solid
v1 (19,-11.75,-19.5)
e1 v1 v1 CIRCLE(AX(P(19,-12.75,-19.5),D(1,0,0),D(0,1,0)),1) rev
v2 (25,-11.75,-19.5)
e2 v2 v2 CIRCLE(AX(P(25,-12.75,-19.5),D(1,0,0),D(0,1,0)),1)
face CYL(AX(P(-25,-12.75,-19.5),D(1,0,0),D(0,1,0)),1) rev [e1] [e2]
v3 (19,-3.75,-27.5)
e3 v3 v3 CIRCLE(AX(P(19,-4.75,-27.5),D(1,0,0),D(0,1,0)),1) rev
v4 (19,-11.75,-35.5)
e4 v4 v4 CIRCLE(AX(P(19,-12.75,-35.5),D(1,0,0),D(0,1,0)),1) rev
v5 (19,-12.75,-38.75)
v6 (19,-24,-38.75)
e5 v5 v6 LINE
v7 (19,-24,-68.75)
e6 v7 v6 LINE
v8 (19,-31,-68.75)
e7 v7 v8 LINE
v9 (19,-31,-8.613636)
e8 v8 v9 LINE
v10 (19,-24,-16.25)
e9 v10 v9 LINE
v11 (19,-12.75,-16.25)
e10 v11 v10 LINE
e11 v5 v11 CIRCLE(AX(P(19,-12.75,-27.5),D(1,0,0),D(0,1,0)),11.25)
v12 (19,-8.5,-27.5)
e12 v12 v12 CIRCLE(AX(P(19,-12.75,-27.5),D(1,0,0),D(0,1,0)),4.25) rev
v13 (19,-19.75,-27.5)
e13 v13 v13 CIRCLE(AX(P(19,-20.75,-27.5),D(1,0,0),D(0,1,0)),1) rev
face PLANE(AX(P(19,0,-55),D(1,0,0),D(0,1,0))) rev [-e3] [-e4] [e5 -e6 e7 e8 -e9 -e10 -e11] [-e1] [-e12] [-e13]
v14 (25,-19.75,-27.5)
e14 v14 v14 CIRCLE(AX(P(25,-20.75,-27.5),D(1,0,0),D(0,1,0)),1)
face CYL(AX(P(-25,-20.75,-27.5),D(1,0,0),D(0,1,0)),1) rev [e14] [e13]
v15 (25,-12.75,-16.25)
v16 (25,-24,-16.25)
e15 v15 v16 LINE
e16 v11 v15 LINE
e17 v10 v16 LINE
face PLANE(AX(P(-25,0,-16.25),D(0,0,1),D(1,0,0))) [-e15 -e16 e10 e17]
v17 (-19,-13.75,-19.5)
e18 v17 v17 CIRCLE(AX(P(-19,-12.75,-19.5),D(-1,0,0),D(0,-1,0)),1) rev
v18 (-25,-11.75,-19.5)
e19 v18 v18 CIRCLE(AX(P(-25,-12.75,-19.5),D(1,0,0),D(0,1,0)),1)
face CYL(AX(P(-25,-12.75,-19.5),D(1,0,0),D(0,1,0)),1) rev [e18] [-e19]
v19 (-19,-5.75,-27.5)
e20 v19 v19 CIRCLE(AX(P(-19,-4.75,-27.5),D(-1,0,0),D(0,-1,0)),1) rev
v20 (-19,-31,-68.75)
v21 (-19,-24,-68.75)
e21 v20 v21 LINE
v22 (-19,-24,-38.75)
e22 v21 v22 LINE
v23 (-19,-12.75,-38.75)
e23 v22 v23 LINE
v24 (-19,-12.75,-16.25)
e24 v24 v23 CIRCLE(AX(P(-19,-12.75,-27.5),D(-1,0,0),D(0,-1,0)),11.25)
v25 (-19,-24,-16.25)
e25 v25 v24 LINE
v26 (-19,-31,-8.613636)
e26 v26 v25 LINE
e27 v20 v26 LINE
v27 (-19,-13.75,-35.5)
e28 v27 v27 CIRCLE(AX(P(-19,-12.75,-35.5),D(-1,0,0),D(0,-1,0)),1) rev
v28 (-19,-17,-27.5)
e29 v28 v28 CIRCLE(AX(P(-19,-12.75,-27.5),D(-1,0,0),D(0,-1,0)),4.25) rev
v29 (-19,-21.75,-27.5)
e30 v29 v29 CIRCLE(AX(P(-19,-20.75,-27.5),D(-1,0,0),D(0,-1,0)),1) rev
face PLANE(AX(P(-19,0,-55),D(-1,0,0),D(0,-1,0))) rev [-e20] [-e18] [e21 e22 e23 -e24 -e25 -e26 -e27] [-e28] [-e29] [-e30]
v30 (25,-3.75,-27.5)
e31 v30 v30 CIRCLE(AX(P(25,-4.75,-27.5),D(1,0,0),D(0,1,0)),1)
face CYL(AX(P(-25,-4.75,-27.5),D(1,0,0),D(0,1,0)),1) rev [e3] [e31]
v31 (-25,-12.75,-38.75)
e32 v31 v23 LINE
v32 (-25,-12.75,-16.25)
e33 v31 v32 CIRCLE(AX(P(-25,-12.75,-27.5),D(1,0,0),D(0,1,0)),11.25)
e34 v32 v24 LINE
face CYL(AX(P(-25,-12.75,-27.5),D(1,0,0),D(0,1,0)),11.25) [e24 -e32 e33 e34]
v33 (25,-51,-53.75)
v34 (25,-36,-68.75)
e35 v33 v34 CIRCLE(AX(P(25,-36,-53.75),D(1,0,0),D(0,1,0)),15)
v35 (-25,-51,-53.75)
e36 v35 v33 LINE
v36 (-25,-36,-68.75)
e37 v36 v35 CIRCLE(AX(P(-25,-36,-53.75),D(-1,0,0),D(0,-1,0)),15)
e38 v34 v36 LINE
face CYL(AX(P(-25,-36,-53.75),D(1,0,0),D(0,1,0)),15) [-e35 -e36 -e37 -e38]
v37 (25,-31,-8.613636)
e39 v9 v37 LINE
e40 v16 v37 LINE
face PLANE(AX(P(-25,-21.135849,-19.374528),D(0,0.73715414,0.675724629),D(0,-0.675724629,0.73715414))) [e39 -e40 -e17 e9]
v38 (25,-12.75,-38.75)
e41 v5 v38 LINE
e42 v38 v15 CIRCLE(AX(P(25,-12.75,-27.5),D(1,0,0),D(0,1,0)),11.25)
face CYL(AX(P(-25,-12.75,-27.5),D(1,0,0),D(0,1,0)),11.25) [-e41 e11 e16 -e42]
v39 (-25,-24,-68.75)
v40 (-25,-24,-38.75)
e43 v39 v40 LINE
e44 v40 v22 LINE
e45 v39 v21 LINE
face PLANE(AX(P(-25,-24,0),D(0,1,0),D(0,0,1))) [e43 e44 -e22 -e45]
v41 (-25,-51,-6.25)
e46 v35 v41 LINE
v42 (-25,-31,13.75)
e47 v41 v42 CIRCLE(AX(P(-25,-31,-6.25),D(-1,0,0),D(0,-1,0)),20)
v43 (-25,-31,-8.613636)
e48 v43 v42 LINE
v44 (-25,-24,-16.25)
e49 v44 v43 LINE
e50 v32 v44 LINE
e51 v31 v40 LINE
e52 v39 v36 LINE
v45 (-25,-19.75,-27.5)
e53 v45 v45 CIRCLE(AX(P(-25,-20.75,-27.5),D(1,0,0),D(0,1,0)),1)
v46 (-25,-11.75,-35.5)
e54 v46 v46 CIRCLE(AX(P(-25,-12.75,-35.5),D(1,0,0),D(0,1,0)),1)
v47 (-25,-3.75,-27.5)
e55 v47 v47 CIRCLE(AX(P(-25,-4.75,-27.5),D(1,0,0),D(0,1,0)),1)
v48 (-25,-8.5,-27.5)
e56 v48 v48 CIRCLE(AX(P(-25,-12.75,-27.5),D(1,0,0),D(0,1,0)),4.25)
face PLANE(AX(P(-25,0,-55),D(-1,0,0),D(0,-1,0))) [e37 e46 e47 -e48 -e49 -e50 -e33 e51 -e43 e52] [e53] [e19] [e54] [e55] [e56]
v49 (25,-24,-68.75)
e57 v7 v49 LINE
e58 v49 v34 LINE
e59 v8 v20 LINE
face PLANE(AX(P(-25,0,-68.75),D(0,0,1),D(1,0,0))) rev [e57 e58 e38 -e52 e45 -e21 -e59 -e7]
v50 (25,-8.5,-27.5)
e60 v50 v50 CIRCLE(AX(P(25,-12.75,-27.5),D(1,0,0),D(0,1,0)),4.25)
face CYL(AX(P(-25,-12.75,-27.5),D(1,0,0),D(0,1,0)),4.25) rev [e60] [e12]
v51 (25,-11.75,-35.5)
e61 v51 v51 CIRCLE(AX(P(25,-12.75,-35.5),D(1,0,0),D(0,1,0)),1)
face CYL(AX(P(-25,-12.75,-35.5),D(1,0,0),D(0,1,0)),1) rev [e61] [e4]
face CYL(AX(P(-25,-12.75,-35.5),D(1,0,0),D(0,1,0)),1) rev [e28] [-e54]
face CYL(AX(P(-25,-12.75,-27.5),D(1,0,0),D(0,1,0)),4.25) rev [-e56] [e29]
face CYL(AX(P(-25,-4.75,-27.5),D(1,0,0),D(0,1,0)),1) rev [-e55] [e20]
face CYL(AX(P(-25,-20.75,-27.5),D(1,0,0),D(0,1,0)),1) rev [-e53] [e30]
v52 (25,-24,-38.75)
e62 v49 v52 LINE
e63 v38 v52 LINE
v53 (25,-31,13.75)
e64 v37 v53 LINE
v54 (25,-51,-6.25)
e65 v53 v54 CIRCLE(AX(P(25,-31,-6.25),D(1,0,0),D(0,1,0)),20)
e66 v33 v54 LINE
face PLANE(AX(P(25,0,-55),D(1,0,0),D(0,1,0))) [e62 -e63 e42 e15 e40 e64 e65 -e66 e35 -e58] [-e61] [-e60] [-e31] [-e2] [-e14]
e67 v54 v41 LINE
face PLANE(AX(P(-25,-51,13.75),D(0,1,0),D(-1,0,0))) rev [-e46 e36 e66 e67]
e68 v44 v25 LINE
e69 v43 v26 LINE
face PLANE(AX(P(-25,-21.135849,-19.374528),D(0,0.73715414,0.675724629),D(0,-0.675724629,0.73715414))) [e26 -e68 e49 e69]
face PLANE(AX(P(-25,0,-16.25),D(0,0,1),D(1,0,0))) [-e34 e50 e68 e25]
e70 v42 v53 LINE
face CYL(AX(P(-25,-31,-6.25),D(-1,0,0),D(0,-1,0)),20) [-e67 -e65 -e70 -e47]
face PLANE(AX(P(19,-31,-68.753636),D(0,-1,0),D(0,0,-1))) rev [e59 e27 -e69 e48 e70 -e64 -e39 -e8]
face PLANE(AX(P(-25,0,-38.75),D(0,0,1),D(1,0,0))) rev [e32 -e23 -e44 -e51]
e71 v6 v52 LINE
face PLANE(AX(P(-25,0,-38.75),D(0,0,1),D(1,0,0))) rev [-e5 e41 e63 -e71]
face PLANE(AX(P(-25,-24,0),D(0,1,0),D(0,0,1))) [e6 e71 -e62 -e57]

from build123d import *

# Parameters (mm, degrees)
SKETCH1_W            = 50
SKETCH1_H            = 170
BOSS_EXTRUDE1_DEPTH  = 55
SKETCH2_W            = 34
SKETCH2_H            = 27
CUT_EXTRUDE1_DEPTH   = 181.416185527
SKETCH3_W            = 10
SKETCH3_H            = 24
SKETCH3_R            = 4.25
SKETCH3_R_2          = 1
CUT_EXTRUDE2_DEPTH   = 186.539753153
SKETCH4_W            = 2
SKETCH4_H            = 24
CUT_EXTRUDE3_DEPTH   = 178.623196683
SKETCH5_W            = 6.25
SKETCH5_H            = 11.25
CUT_EXTRUDE4_DEPTH   = 186.539753153
SKETCH6_W            = 38
SKETCH6_H            = 10
CUT_EXTRUDE5_DEPTH   = 181.416185527
SKETCH8_W            = 13.25
SKETCH8_H            = 2.25
CUT_EXTRUDE7_DEPTH   = 186.539753153
SKETCH9_W            = 34
SKETCH9_H            = 35.25
CUT_EXTRUDE8_DEPTH   = 179.297679458
SKETCH11_W           = 13.25
SKETCH11_H           = 20.25
CUT_EXTRUDE9_DEPTH   = 184.480414486
SKETCH12_W           = 28.5
SKETCH12_H           = 15
BOSS_EXTRUDE2_DEPTH  = 8
SKETCH14_W           = 34
SKETCH14_H           = 15
SKETCH14_H_2         = 10.25
BOSS_EXTRUDE3_DEPTH  = 13.25
SKETCH16_R           = 4.5
SKETCH16_R_2         = 2.5
CUT_EXTRUDE13_DEPTH  = 8
SKETCH17_R           = 4.5
SKETCH17_W           = 55
SKETCH17_H           = 10.25
CUT_EXTRUDE15_DEPTH  = 175.384811552
SKETCH18_W           = 71.25
SKETCH18_H           = 27.5
SKETCH18_W_2         = 13.75
SKETCH18_W_3         = 16.25
BOSS_EXTRUDE4_DEPTH  = 50
SKETCH19_W           = 38
SKETCH19_H           = 7
CUT_EXTRUDE16_DEPTH  = 152.25227271
SKETCH20_W           = 57.5
SKETCH20_H           = 27.5
CUT_EXTRUDE17_DEPTH  = 102.137591923
CUT_EXTRUDE18_DEPTH  = 100.39221549
SKETCH22_W           = 82.5
SKETCH22_H           = 2.5
BOSS_EXTRUDE5_DEPTH  = 50
SKETCH24_W           = 22
SKETCH24_H           = 17
CUT_EXTRUDE19_DEPTH  = 101.710289941
SKETCH25_W           = 38
SKETCH25_H           = 38.136363636
CUT_EXTRUDE20_DEPTH  = 10
SKETCH26_W           = 82.5
SKETCH26_H           = 2.5
CUT_EXTRUDE21_DEPTH  = 101.710289941
SKETCH27_W           = 38
SKETCH27_H           = 5
BOSS_EXTRUDE6_DEPTH  = 60.14
SKETCH29_W           = 38
SKETCH29_H           = 5
BOSS_EXTRUDE8_DEPTH  = 60.14
SKETCH30_W           = 6
SKETCH30_H           = 17
BOSS_EXTRUDE9_DEPTH  = 22.14
SKETCH31_W           = 22.363636364
SKETCH31_H           = 20.5
BOSS_EXTRUDE10_DEPTH = 50
SKETCH32_W           = 82.5
SKETCH32_H           = 0.5
SKETCH32_W_2         = 0.14
SKETCH32_H_2         = 17
CUT_EXTRUDE22_DEPTH  = 100.489105434
FILLET1_R            = 15
FILLET2_R            = 20


with BuildPart() as part:
    # Sketch1 → Boss-Extrude1 (new body)
    with BuildSketch(Plane.XY):
        with Locations((0, -85)):
            Rectangle(SKETCH1_W, SKETCH1_H)
    extrude(amount=-BOSS_EXTRUDE1_DEPTH)

    # Sketch2 → Cut-Extrude1 (cut, through all)
    with BuildSketch(Plane.XY):
        with Locations((0, -13.5)):
            Rectangle(SKETCH2_W, SKETCH2_H)
    extrude(amount=-CUT_EXTRUDE1_DEPTH, mode=Mode.SUBTRACT)

    # Sketch3 → Cut-Extrude2 (cut, through all)
    with BuildSketch(Plane(origin=(25, 0, 0), x_dir=(0, 0, -1), z_dir=(1, 0, 0))):
        with Locations((50, -12)):
            Rectangle(SKETCH3_W, SKETCH3_H)
        with Locations((5, -12)):
            Rectangle(SKETCH3_W, SKETCH3_H)
        with Locations(Location((27.5, -12.75, 0), (0, 0, 90))):
            Circle(SKETCH3_R)
        with Locations(Location((35.5, -12.75, 0), (0, 0, 90))):
            Circle(SKETCH3_R_2)
        with Locations(Location((27.5, -4.75, 0), (0, 0, 90))):
            Circle(SKETCH3_R_2)
        with Locations(Location((27.5, -20.75, 0), (0, 0, 90))):
            Circle(SKETCH3_R_2)
        with Locations(Location((19.5, -12.75, 0), (0, 0, 90))):
            Circle(SKETCH3_R_2)
    extrude(amount=-CUT_EXTRUDE2_DEPTH, mode=Mode.SUBTRACT)

    # Sketch4 → Cut-Extrude3 (cut, through all)
    with BuildSketch(Plane.XY.offset(-10)):
        with Locations((-18, -12)):
            Rectangle(SKETCH4_W, SKETCH4_H)
        with Locations((18, -12)):
            Rectangle(SKETCH4_W, SKETCH4_H)
    extrude(amount=-CUT_EXTRUDE3_DEPTH, mode=Mode.SUBTRACT)

    # Sketch5 → Cut-Extrude4 (cut, through all)
    with BuildSketch(Plane(origin=(25, 0, 0), x_dir=(0, 0, -1), z_dir=(1, 0, 0))):
        with BuildLine():
            Line((45, 0), (10, 0))
            Line((10, 0), (10, -12.75))
            Line((10, -12.75), (16.25, -12.75))
            ThreePointArc((16.25, -12.75), (27.5, -1.5), (38.75, -12.75))
            Line((38.75, -12.75), (45, -12.75))
            Line((45, -12.75), (45, 0))
        make_face()
        with Locations((13.125, -18.375)):
            Rectangle(SKETCH5_W, SKETCH5_H)
        with Locations((41.875, -18.375)):
            Rectangle(SKETCH5_W, SKETCH5_H)
    extrude(amount=-CUT_EXTRUDE4_DEPTH, mode=Mode.SUBTRACT)

    # Sketch6 → Cut-Extrude5 (cut, through all)
    with BuildSketch(Plane.XY):
        with Locations((0, -29)):
            Rectangle(SKETCH6_W, SKETCH6_H)
    extrude(amount=-CUT_EXTRUDE5_DEPTH, mode=Mode.SUBTRACT)

    # Sketch8 → Cut-Extrude7 (cut, through all)
    with BuildSketch(Plane(origin=(25, 0, 0), x_dir=(0, 0, -1), z_dir=(1, 0, 0))):
        with BuildLine():
            Line((27.5, -157.5), (27.5, -132.5))
            Line((27.5, -132.5), (13.25, -132.5))
            Line((13.25, -132.5), (13.25, -167.75))
            Line((13.25, -167.75), (17.25, -167.75))
            ThreePointArc((17.25, -167.75), (20.252155493, -160.502155493), (27.5, -157.5))
        make_face()
        with BuildLine():
            Line((41.75, -167.75), (41.75, -132.5))
            Line((41.75, -132.5), (27.5, -132.5))
            Line((27.5, -132.5), (27.5, -157.5))
            ThreePointArc((27.5, -157.5), (34.747844507, -160.502155493), (37.75, -167.75))
            Line((37.75, -167.75), (41.75, -167.75))
        make_face()
        with Locations((48.375, -168.875)):
            Rectangle(SKETCH8_W, SKETCH8_H)
        with Locations((6.625, -168.875)):
            Rectangle(SKETCH8_W, SKETCH8_H)
        with BuildLine():
            Line((17.25, -167.75), (13.25, -167.75))
            Line((13.25, -167.75), (13.25, -170))
            Line((13.25, -170), (17.5, -170))
            ThreePointArc((17.5, -170), (17.31269172, -168.881923142), (17.25, -167.75))
        make_face()
        with BuildLine():
            Line((41.75, -170), (41.75, -167.75))
            Line((41.75, -167.75), (37.75, -167.75))
            ThreePointArc((37.75, -167.75), (37.68730828, -168.881923142), (37.5, -170))
            Line((37.5, -170), (41.75, -170))
        make_face()
        with BuildLine():
            Line((27.5, -167.75), (27.5, -157.5))
            ThreePointArc((27.5, -157.5), (20.252155493, -160.502155493), (17.25, -167.75))
            Line((17.25, -167.75), (27.5, -167.75))
        make_face()
        with BuildLine():
            ThreePointArc((37.75, -167.75), (34.747844507, -160.502155493), (27.5, -157.5))
            Line((27.5, -157.5), (27.5, -167.75))
            Line((27.5, -167.75), (37.75, -167.75))
        make_face()
        with BuildLine():
            Line((27.5, -170), (27.5, -167.75))
            Line((27.5, -167.75), (17.25, -167.75))
            ThreePointArc((17.25, -167.75), (17.31269172, -168.881923142), (17.5, -170))
            Line((17.5, -170), (27.5, -170))
        make_face()
        with BuildLine():
            ThreePointArc((37.5, -170), (37.68730828, -168.881923142), (37.75, -167.75))
            Line((37.75, -167.75), (27.5, -167.75))
            Line((27.5, -167.75), (27.5, -170))
            Line((27.5, -170), (37.5, -170))
        make_face()
    extrude(amount=-CUT_EXTRUDE7_DEPTH, mode=Mode.SUBTRACT)

    # Sketch9 → Cut-Extrude8 (cut, through all)
    with BuildSketch(Plane.XY):
        with Locations((0, -150.125)):
            Rectangle(SKETCH9_W, SKETCH9_H)
    extrude(amount=-CUT_EXTRUDE8_DEPTH, mode=Mode.SUBTRACT)

    # Sketch11 → Cut-Extrude9 (cut, through all)
    with BuildSketch(Plane(origin=(25, 0, 0), x_dir=(0, 0, -1), z_dir=(1, 0, 0))):
        with BuildLine():
            ThreePointArc((17.25, -167.75), (20.252155493, -160.502155493), (27.5, -157.5))
            Line((27.5, -157.5), (27.5, -147.5))
            Line((27.5, -147.5), (13.25, -147.5))
            Line((13.25, -147.5), (13.25, -167.75))
            Line((13.25, -167.75), (17.25, -167.75))
        make_face()
        with BuildLine():
            Line((27.5, -147.5), (27.5, -157.5))
            ThreePointArc((27.5, -157.5), (34.747844507, -160.502155493), (37.75, -167.75))
            Line((37.75, -167.75), (41.75, -167.75))
            Line((41.75, -167.75), (41.75, -147.5))
            Line((41.75, -147.5), (27.5, -147.5))
        make_face()
        with Locations((48.375, -157.625)):
            Rectangle(SKETCH11_W, SKETCH11_H)
        with Locations((6.625, -157.625)):
            Rectangle(SKETCH11_W, SKETCH11_H)
    extrude(amount=-CUT_EXTRUDE9_DEPTH, mode=Mode.SUBTRACT)

    # Sketch12 → Boss-Extrude2 (add)
    with BuildSketch(Plane(origin=(25, 0, 0), x_dir=(0, 0, -1), z_dir=(1, 0, 0))):
        with Locations((27.5, -140)):
            Rectangle(SKETCH12_W, SKETCH12_H)
    boss_extrude2 = extrude(amount=-BOSS_EXTRUDE2_DEPTH)

    # Mirror1: Boss-Extrude2 across plane
    add(boss_extrude2.mirror(Plane(origin=(0, 0, 0), x_dir=(0, 0, 1), z_dir=(1, 0, 0))))

    # Sketch14 → Boss-Extrude3 (add)
    with BuildSketch(Plane.XY):
        with Locations((0, -140)):
            Rectangle(SKETCH14_W, SKETCH14_H)
        with Locations((0, -152.625)):
            Rectangle(SKETCH14_W, SKETCH14_H_2)
    boss_extrude3 = extrude(amount=-BOSS_EXTRUDE3_DEPTH)

    # Mirror2: Boss-Extrude3 across plane
    add(boss_extrude3.mirror(Plane.XY.offset(-27.5)))

    # Sketch16 → Cut-Extrude13 (cut)
    # profile 1 of 3: a face of its own
    with BuildSketch(Plane(origin=(25, 0, 0), x_dir=(0, 0, -1), z_dir=(1, 0, 0))):
        with Locations(Location((16.5, -135.75, 0), (0, 0, 90))):
            Circle(SKETCH16_R)
        with Locations((16.5, -135.75)):
            Circle(SKETCH16_R_2, mode=Mode.SUBTRACT)
    # profile 2 of 3: a face of its own
    with BuildSketch(Plane(origin=(25, 0, 0), x_dir=(0, 0, -1), z_dir=(1, 0, 0))):
        with Locations((16.5, -135.75)):
            Circle(SKETCH16_R_2)
    # profile 3 of 3: a face of its own
    with BuildSketch(Plane(origin=(25, 0, 0), x_dir=(0, 0, -1), z_dir=(1, 0, 0))):
        with Locations(Location((38.5, -135.75, 0), (0, 0, 90))):
            Circle(SKETCH16_R)
    cut_extrude13 = extrude(amount=-CUT_EXTRUDE13_DEPTH, mode=Mode.SUBTRACT)

    # Mirror3: Cut-Extrude13 across plane
    add(cut_extrude13.mirror(Plane(origin=(0, 0, 0), x_dir=(0, 0, 1), z_dir=(1, 0, 0))), mode=Mode.SUBTRACT)

    # Sketch17 → Cut-Extrude15 (cut, through all)
    # profile 1 of 4: a face of its own
    with BuildSketch(Plane(origin=(25, 0, 0), x_dir=(0, 0, -1), z_dir=(1, 0, 0))):
        Polygon((55, -51.5), (27.5, -51.5), (0, -51.5), (0, -147.5), (55, -147.5), align=None)
        with Locations((16.5, -135.75)):
            Circle(SKETCH17_R, mode=Mode.SUBTRACT)
        with Locations((38.5, -135.75)):
            Circle(SKETCH17_R, mode=Mode.SUBTRACT)
    # profile 2 of 4: a face of its own
    with BuildSketch(Plane(origin=(25, 0, 0), x_dir=(0, 0, -1), z_dir=(1, 0, 0))):
        with Locations((27.5, -152.625)):
            Rectangle(SKETCH17_W, SKETCH17_H)
    # profile 3 of 4: a face of its own
    with BuildSketch(Plane(origin=(25, 0, 0), x_dir=(0, 0, -1), z_dir=(1, 0, 0))):
        with Locations((38.5, -135.75)):
            Circle(SKETCH17_R)
    # profile 4 of 4: a face of its own
    with BuildSketch(Plane(origin=(25, 0, 0), x_dir=(0, 0, -1), z_dir=(1, 0, 0))):
        with Locations((16.5, -135.75)):
            Circle(SKETCH17_R)
    extrude(amount=-CUT_EXTRUDE15_DEPTH, mode=Mode.SUBTRACT)

    # Sketch18 → Boss-Extrude4 (add)
    with BuildSketch(Plane(origin=(25, 0, 0), x_dir=(0, 0, -1), z_dir=(1, 0, 0))):
        with Locations((-35.625, -37.75)):
            Rectangle(SKETCH18_W, SKETCH18_H)
        with Locations((61.875, -37.75)):
            Rectangle(SKETCH18_W_2, SKETCH18_H)
        Polygon((38.75, -51.5), (38.75, -24), (16.25, -24), (0, -24), (0, -51.5), align=None)
        with Locations((46.875, -37.75)):
            Rectangle(SKETCH18_W_3, SKETCH18_H)
    extrude(amount=-BOSS_EXTRUDE4_DEPTH)

    # Sketch19 → Cut-Extrude16 (cut, through all)
    with BuildSketch(Plane.XY.offset(71.25)):
        with Locations((0, -27.5)):
            Rectangle(SKETCH19_W, SKETCH19_H)
    extrude(amount=-CUT_EXTRUDE16_DEPTH, mode=Mode.SUBTRACT)

    # Sketch20 → Cut-Extrude17 (cut, through all)
    with BuildSketch(Plane(origin=(25, 0, 0), x_dir=(0, 0, -1), z_dir=(1, 0, 0))):
        with Locations((-42.5, -37.75)):
            Rectangle(SKETCH20_W, SKETCH20_H)
    extrude(amount=-CUT_EXTRUDE17_DEPTH, mode=Mode.SUBTRACT)

    # Sketch21 → Cut-Extrude18 (cut, through all)
    with BuildSketch(Plane(origin=(25, 0, 0), x_dir=(0, 0, -1), z_dir=(1, 0, 0))):
        Polygon((16.25, -24), (-13.75, -51.5), (-13.75, -24), align=None)
    extrude(amount=-CUT_EXTRUDE18_DEPTH, mode=Mode.SUBTRACT)

    # Sketch22 → Boss-Extrude5 (add)
    with BuildSketch(Plane(origin=(25, 0, 0), x_dir=(0, 0, -1), z_dir=(1, 0, 0))):
        with Locations((27.5, -52.75)):
            Rectangle(SKETCH22_W, SKETCH22_H)
    extrude(amount=-BOSS_EXTRUDE5_DEPTH)

    # Sketch24 → Cut-Extrude19 (cut, through all)
    with BuildSketch(Plane(origin=(25, 0, 0), x_dir=(0, 0, -1), z_dir=(1, 0, 0))):
        with Locations((57.75, -32.5)):
            Rectangle(SKETCH24_W, SKETCH24_H)
    extrude(amount=-CUT_EXTRUDE19_DEPTH, mode=Mode.SUBTRACT)

    # Sketch25 → Cut-Extrude20 (cut)
    with BuildSketch(Plane(origin=(0, -31, 0), x_dir=(1, 0, 0), z_dir=(0, 1, 0))):
        with Locations((0, 27.681818182)):
            Rectangle(SKETCH25_W, SKETCH25_H)
    extrude(amount=-CUT_EXTRUDE20_DEPTH, mode=Mode.SUBTRACT)

    # Sketch26 → Cut-Extrude21 (cut, through all)
    with BuildSketch(Plane(origin=(25, 0, 0), x_dir=(0, 0, -1), z_dir=(1, 0, 0))):
        with Locations((27.5, -52.75)):
            Rectangle(SKETCH26_W, SKETCH26_H)
    extrude(amount=-CUT_EXTRUDE21_DEPTH, mode=Mode.SUBTRACT)

    # Sketch27 → Boss-Extrude6 (add)
    with BuildSketch(Plane(origin=(0, 0, -8.613636364), x_dir=(-1, 0, 0), z_dir=(0, 0, -1))):
        with Locations((0, -38.5)):
            Rectangle(SKETCH27_W, SKETCH27_H)
    extrude(amount=BOSS_EXTRUDE6_DEPTH)

    # Sketch29 → Boss-Extrude8 (add)
    with BuildSketch(Plane(origin=(0, 0, -8.613636364), x_dir=(-1, 0, 0), z_dir=(0, 0, -1))):
        with Locations((0, -33.5)):
            Rectangle(SKETCH29_W, SKETCH29_H)
    extrude(amount=BOSS_EXTRUDE8_DEPTH)

    # Sketch30 → Boss-Extrude9 (add)
    with BuildSketch(Plane(origin=(0, 0, -46.75), x_dir=(-1, 0, 0), z_dir=(0, 0, -1))):
        with Locations((-22, -32.5)):
            Rectangle(SKETCH30_W, SKETCH30_H)
        with Locations((22, -32.5)):
            Rectangle(SKETCH30_W, SKETCH30_H)
    extrude(amount=BOSS_EXTRUDE9_DEPTH)

    # Sketch31 → Boss-Extrude10 (add)
    with BuildSketch(Plane(origin=(25, 0, 0), x_dir=(0, 0, -1), z_dir=(1, 0, 0))):
        with Locations((-2.568181818, -41.25)):
            Rectangle(SKETCH31_W, SKETCH31_H)
    extrude(amount=-BOSS_EXTRUDE10_DEPTH)

    # Sketch32 → Cut-Extrude22 (cut, through all)
    with BuildSketch(Plane(origin=(25, 0, 0), x_dir=(0, 0, -1), z_dir=(1, 0, 0))):
        with Locations((27.5, -51.25)):
            Rectangle(SKETCH32_W, SKETCH32_H)
        with Locations((68.82, -32.5)):
            Rectangle(SKETCH32_W_2, SKETCH32_H_2)
    extrude(amount=-CUT_EXTRUDE22_DEPTH, mode=Mode.SUBTRACT)

    # Fillet1
    fillet1_edges = [part.edges().sort_by_distance(p)[0] for p in [
        (0, -51, -68.75),
    ]]
    fillet(fillet1_edges, radius=FILLET1_R)

    # Fillet2
    fillet2_edges = [part.edges().sort_by_distance(p)[0] for p in [
        (0, -51, 13.75),
    ]]
    fillet(fillet2_edges, radius=FILLET2_R - 0.0001)  # a hair under: the kernel refuses the full size


solid = part.part
